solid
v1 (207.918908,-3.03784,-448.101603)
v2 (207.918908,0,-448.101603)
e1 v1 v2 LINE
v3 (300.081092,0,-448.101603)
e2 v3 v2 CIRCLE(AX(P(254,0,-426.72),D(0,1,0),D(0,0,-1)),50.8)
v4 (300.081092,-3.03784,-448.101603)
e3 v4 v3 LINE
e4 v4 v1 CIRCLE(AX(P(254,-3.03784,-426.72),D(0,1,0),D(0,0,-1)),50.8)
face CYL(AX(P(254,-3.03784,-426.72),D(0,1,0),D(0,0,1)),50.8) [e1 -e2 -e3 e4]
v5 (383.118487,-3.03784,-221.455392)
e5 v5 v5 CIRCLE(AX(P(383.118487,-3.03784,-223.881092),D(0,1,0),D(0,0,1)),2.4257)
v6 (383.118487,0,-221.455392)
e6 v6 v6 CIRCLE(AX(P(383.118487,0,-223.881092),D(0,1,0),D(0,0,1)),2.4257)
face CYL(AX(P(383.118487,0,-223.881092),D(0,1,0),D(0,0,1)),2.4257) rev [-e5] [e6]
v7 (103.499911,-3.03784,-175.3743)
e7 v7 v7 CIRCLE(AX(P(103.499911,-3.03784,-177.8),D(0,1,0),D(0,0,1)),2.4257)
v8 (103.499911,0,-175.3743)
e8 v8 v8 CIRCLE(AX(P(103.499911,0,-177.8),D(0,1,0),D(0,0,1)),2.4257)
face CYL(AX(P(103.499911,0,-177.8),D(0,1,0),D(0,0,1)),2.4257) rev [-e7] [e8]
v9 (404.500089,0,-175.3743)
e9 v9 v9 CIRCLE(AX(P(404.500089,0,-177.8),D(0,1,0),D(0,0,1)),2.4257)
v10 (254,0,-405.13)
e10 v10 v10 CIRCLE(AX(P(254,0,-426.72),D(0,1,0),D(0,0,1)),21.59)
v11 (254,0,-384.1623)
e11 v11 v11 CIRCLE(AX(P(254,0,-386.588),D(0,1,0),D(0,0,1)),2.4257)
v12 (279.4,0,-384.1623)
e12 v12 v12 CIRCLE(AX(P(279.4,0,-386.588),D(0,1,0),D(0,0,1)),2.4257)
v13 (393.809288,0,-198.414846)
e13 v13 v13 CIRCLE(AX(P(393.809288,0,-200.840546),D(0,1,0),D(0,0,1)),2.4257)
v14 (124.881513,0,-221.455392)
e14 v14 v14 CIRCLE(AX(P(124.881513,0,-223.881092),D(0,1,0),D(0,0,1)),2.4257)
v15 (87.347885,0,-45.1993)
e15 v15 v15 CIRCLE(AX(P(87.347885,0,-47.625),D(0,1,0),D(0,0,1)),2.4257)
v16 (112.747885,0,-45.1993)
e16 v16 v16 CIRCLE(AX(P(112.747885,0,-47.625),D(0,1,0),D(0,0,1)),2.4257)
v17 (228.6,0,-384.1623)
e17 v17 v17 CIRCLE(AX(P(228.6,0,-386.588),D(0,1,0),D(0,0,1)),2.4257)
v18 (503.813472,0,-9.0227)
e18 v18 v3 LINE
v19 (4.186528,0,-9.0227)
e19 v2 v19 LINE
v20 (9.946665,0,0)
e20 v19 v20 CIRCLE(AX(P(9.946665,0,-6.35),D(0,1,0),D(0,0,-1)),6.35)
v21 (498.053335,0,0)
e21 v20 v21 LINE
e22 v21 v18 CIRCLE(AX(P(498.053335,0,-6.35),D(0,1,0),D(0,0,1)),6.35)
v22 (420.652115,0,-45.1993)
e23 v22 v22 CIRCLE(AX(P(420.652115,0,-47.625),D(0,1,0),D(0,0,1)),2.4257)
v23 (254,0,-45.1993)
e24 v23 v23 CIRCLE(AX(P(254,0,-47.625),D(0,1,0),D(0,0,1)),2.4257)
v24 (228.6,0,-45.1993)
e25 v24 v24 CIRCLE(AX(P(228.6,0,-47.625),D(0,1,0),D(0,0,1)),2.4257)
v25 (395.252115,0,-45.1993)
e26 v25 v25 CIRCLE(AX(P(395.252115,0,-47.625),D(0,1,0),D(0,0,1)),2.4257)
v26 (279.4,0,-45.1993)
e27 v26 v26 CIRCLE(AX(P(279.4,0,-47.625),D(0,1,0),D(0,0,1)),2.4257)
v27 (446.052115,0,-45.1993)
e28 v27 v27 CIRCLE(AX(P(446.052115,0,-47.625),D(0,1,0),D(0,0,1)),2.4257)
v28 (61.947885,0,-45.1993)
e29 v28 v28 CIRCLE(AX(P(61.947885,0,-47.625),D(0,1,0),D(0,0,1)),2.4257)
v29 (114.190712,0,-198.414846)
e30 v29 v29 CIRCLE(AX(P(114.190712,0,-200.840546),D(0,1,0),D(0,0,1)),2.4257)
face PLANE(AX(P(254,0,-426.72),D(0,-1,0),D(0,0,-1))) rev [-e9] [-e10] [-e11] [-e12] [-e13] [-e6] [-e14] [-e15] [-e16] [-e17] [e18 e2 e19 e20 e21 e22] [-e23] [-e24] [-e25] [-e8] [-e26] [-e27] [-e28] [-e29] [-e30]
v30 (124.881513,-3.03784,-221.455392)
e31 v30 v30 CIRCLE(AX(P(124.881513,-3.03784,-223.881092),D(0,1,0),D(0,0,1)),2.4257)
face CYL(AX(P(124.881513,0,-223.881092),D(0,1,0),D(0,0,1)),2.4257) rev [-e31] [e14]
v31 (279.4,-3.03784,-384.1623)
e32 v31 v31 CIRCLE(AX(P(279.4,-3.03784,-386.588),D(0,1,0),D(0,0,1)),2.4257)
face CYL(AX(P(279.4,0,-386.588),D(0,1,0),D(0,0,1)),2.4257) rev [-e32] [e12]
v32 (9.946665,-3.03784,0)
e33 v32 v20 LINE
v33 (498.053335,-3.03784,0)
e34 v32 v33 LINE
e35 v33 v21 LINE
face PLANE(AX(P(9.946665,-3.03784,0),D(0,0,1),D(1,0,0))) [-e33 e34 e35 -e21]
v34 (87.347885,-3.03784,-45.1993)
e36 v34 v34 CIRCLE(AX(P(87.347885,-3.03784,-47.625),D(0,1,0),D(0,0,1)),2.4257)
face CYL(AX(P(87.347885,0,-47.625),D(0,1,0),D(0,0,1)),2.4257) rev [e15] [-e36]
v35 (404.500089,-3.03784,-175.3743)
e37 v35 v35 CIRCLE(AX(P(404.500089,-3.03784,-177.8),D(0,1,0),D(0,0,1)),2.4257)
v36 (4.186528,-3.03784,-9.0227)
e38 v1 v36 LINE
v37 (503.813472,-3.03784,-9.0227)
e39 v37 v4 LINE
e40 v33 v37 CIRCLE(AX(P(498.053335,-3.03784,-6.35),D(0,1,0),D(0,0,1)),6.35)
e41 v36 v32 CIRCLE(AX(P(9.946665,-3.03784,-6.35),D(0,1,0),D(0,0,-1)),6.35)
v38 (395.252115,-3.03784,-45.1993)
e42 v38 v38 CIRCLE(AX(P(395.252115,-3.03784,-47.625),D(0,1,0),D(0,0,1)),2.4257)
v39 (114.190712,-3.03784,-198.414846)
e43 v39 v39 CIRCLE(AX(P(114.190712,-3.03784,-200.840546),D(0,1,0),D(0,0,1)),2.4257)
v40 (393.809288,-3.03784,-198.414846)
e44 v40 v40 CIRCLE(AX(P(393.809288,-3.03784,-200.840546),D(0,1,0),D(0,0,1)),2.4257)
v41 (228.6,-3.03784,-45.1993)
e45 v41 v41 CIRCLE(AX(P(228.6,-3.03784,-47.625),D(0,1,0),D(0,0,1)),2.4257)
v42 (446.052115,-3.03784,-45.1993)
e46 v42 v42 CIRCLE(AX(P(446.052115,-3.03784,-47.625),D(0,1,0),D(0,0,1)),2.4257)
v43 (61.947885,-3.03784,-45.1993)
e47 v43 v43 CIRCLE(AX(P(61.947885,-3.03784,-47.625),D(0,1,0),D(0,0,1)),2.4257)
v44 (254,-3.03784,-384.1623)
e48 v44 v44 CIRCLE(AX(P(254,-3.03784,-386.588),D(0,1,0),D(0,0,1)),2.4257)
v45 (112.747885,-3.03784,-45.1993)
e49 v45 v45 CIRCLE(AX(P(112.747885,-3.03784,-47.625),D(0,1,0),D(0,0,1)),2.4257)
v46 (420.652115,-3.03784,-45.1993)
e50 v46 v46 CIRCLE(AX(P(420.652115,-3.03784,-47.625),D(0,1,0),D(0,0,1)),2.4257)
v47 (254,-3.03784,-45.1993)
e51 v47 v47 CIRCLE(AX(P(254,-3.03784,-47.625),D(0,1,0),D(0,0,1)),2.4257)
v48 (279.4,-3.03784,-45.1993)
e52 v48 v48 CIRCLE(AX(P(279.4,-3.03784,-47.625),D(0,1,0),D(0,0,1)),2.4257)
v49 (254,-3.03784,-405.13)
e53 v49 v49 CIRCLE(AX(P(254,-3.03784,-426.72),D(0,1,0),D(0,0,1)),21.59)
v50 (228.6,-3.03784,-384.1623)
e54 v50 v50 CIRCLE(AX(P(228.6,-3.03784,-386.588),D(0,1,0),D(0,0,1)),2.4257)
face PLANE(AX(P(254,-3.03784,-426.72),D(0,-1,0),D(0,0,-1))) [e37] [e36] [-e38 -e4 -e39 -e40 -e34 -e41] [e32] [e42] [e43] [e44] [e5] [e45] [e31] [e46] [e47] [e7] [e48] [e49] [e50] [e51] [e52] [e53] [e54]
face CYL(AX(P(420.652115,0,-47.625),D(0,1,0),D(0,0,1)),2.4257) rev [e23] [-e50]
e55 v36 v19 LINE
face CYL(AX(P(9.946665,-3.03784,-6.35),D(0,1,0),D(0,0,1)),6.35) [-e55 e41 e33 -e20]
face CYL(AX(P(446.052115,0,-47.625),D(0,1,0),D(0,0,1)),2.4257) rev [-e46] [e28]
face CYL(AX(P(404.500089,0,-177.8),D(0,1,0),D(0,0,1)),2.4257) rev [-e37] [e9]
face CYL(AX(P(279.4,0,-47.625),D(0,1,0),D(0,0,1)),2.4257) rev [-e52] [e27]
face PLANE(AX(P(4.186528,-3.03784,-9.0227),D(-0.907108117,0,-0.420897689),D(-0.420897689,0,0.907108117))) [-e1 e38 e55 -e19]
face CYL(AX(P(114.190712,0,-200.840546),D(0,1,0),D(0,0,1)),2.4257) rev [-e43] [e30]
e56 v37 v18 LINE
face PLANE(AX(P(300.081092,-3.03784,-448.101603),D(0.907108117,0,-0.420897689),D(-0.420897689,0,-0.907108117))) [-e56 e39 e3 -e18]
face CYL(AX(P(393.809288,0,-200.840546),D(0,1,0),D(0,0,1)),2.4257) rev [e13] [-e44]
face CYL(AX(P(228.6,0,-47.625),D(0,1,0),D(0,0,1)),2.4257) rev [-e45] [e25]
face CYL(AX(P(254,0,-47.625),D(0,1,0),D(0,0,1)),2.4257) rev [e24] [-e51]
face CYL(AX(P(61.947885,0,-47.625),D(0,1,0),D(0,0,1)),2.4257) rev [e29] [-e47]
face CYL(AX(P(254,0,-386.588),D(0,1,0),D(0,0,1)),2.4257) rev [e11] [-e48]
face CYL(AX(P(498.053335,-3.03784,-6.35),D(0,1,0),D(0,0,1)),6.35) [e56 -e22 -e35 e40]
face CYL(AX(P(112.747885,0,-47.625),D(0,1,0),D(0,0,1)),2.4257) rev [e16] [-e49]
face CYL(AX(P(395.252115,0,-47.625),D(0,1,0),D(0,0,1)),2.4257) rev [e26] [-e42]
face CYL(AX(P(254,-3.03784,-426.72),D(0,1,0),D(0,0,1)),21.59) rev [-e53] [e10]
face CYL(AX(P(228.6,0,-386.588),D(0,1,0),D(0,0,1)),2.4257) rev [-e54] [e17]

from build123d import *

# Parameters (mm, degrees)
SKETCH1_R                   = 21.59
BASE_FLANGE1_DEPTH          = 3.03784
F_11_0_191_DIAMETER_HOLE1_D = 4.8514
F_11_0_191_DIAMETER_HOLE2_D = 4.8514


# Sheet-metal steps are written as plain solids
with BuildPart() as part:
    # Sketch1 → Base-Flange1 (new body)
    with BuildSketch(Plane(origin=(0, 0, 0), x_dir=(1, 0, 0), z_dir=(0, 1, 0))):
        with BuildLine():
            Line((9.946664741, 0), (498.053335259, 0))
            ThreePointArc((498.053335259, 0), (503.405631357, 2.933067681), (503.813471801, 9.022700323))
            Line((503.813471801, 9.022700323), (300.081092338, 448.101602582))
            ThreePointArc((300.081092338, 448.101602582), (254, 477.52), (207.918907662, 448.101602582))
            Line((207.918907662, 448.101602582), (4.186528199, 9.022700323))
            ThreePointArc((4.186528199, 9.022700323), (4.594368643, 2.933067681), (9.946664741, 0))
        make_face()
        with Locations(Location((254, 426.72, 0), (0, 0, 270))):
            Circle(SKETCH1_R, mode=Mode.SUBTRACT)
    extrude(amount=-BASE_FLANGE1_DEPTH)

    # #11 (0.191) Diameter Hole1 (through all)
    with Locations(Plane(origin=(0, 0, 0), x_dir=(1, 0, 0), z_dir=(0, 1, 0))):
        with Locations((61.947885367, 47.625), (87.347885367, 47.625), (112.747885367, 47.625), (228.6, 47.625), (254, 47.625), (446.052114633, 47.625), (420.652114633, 47.625), (395.252114633, 47.625), (279.4, 47.625), (103.499910638, 177.8), (114.190711929, 200.840546169), (124.88151322, 223.881092338), (404.500089362, 177.8), (393.809288071, 200.840546169), (383.11848678, 223.881092338)):
            Hole(F_11_0_191_DIAMETER_HOLE1_D / 2)

    # #11 (0.191) Diameter Hole2 (through all)
    with Locations(Plane(origin=(0, 0, 0), x_dir=(1, 0, 0), z_dir=(0, 1, 0))):
        with Locations((228.6, 386.588000012), (254, 386.588000012), (279.4, 386.588000012)):
            Hole(F_11_0_191_DIAMETER_HOLE2_D / 2)


solid = part.part
